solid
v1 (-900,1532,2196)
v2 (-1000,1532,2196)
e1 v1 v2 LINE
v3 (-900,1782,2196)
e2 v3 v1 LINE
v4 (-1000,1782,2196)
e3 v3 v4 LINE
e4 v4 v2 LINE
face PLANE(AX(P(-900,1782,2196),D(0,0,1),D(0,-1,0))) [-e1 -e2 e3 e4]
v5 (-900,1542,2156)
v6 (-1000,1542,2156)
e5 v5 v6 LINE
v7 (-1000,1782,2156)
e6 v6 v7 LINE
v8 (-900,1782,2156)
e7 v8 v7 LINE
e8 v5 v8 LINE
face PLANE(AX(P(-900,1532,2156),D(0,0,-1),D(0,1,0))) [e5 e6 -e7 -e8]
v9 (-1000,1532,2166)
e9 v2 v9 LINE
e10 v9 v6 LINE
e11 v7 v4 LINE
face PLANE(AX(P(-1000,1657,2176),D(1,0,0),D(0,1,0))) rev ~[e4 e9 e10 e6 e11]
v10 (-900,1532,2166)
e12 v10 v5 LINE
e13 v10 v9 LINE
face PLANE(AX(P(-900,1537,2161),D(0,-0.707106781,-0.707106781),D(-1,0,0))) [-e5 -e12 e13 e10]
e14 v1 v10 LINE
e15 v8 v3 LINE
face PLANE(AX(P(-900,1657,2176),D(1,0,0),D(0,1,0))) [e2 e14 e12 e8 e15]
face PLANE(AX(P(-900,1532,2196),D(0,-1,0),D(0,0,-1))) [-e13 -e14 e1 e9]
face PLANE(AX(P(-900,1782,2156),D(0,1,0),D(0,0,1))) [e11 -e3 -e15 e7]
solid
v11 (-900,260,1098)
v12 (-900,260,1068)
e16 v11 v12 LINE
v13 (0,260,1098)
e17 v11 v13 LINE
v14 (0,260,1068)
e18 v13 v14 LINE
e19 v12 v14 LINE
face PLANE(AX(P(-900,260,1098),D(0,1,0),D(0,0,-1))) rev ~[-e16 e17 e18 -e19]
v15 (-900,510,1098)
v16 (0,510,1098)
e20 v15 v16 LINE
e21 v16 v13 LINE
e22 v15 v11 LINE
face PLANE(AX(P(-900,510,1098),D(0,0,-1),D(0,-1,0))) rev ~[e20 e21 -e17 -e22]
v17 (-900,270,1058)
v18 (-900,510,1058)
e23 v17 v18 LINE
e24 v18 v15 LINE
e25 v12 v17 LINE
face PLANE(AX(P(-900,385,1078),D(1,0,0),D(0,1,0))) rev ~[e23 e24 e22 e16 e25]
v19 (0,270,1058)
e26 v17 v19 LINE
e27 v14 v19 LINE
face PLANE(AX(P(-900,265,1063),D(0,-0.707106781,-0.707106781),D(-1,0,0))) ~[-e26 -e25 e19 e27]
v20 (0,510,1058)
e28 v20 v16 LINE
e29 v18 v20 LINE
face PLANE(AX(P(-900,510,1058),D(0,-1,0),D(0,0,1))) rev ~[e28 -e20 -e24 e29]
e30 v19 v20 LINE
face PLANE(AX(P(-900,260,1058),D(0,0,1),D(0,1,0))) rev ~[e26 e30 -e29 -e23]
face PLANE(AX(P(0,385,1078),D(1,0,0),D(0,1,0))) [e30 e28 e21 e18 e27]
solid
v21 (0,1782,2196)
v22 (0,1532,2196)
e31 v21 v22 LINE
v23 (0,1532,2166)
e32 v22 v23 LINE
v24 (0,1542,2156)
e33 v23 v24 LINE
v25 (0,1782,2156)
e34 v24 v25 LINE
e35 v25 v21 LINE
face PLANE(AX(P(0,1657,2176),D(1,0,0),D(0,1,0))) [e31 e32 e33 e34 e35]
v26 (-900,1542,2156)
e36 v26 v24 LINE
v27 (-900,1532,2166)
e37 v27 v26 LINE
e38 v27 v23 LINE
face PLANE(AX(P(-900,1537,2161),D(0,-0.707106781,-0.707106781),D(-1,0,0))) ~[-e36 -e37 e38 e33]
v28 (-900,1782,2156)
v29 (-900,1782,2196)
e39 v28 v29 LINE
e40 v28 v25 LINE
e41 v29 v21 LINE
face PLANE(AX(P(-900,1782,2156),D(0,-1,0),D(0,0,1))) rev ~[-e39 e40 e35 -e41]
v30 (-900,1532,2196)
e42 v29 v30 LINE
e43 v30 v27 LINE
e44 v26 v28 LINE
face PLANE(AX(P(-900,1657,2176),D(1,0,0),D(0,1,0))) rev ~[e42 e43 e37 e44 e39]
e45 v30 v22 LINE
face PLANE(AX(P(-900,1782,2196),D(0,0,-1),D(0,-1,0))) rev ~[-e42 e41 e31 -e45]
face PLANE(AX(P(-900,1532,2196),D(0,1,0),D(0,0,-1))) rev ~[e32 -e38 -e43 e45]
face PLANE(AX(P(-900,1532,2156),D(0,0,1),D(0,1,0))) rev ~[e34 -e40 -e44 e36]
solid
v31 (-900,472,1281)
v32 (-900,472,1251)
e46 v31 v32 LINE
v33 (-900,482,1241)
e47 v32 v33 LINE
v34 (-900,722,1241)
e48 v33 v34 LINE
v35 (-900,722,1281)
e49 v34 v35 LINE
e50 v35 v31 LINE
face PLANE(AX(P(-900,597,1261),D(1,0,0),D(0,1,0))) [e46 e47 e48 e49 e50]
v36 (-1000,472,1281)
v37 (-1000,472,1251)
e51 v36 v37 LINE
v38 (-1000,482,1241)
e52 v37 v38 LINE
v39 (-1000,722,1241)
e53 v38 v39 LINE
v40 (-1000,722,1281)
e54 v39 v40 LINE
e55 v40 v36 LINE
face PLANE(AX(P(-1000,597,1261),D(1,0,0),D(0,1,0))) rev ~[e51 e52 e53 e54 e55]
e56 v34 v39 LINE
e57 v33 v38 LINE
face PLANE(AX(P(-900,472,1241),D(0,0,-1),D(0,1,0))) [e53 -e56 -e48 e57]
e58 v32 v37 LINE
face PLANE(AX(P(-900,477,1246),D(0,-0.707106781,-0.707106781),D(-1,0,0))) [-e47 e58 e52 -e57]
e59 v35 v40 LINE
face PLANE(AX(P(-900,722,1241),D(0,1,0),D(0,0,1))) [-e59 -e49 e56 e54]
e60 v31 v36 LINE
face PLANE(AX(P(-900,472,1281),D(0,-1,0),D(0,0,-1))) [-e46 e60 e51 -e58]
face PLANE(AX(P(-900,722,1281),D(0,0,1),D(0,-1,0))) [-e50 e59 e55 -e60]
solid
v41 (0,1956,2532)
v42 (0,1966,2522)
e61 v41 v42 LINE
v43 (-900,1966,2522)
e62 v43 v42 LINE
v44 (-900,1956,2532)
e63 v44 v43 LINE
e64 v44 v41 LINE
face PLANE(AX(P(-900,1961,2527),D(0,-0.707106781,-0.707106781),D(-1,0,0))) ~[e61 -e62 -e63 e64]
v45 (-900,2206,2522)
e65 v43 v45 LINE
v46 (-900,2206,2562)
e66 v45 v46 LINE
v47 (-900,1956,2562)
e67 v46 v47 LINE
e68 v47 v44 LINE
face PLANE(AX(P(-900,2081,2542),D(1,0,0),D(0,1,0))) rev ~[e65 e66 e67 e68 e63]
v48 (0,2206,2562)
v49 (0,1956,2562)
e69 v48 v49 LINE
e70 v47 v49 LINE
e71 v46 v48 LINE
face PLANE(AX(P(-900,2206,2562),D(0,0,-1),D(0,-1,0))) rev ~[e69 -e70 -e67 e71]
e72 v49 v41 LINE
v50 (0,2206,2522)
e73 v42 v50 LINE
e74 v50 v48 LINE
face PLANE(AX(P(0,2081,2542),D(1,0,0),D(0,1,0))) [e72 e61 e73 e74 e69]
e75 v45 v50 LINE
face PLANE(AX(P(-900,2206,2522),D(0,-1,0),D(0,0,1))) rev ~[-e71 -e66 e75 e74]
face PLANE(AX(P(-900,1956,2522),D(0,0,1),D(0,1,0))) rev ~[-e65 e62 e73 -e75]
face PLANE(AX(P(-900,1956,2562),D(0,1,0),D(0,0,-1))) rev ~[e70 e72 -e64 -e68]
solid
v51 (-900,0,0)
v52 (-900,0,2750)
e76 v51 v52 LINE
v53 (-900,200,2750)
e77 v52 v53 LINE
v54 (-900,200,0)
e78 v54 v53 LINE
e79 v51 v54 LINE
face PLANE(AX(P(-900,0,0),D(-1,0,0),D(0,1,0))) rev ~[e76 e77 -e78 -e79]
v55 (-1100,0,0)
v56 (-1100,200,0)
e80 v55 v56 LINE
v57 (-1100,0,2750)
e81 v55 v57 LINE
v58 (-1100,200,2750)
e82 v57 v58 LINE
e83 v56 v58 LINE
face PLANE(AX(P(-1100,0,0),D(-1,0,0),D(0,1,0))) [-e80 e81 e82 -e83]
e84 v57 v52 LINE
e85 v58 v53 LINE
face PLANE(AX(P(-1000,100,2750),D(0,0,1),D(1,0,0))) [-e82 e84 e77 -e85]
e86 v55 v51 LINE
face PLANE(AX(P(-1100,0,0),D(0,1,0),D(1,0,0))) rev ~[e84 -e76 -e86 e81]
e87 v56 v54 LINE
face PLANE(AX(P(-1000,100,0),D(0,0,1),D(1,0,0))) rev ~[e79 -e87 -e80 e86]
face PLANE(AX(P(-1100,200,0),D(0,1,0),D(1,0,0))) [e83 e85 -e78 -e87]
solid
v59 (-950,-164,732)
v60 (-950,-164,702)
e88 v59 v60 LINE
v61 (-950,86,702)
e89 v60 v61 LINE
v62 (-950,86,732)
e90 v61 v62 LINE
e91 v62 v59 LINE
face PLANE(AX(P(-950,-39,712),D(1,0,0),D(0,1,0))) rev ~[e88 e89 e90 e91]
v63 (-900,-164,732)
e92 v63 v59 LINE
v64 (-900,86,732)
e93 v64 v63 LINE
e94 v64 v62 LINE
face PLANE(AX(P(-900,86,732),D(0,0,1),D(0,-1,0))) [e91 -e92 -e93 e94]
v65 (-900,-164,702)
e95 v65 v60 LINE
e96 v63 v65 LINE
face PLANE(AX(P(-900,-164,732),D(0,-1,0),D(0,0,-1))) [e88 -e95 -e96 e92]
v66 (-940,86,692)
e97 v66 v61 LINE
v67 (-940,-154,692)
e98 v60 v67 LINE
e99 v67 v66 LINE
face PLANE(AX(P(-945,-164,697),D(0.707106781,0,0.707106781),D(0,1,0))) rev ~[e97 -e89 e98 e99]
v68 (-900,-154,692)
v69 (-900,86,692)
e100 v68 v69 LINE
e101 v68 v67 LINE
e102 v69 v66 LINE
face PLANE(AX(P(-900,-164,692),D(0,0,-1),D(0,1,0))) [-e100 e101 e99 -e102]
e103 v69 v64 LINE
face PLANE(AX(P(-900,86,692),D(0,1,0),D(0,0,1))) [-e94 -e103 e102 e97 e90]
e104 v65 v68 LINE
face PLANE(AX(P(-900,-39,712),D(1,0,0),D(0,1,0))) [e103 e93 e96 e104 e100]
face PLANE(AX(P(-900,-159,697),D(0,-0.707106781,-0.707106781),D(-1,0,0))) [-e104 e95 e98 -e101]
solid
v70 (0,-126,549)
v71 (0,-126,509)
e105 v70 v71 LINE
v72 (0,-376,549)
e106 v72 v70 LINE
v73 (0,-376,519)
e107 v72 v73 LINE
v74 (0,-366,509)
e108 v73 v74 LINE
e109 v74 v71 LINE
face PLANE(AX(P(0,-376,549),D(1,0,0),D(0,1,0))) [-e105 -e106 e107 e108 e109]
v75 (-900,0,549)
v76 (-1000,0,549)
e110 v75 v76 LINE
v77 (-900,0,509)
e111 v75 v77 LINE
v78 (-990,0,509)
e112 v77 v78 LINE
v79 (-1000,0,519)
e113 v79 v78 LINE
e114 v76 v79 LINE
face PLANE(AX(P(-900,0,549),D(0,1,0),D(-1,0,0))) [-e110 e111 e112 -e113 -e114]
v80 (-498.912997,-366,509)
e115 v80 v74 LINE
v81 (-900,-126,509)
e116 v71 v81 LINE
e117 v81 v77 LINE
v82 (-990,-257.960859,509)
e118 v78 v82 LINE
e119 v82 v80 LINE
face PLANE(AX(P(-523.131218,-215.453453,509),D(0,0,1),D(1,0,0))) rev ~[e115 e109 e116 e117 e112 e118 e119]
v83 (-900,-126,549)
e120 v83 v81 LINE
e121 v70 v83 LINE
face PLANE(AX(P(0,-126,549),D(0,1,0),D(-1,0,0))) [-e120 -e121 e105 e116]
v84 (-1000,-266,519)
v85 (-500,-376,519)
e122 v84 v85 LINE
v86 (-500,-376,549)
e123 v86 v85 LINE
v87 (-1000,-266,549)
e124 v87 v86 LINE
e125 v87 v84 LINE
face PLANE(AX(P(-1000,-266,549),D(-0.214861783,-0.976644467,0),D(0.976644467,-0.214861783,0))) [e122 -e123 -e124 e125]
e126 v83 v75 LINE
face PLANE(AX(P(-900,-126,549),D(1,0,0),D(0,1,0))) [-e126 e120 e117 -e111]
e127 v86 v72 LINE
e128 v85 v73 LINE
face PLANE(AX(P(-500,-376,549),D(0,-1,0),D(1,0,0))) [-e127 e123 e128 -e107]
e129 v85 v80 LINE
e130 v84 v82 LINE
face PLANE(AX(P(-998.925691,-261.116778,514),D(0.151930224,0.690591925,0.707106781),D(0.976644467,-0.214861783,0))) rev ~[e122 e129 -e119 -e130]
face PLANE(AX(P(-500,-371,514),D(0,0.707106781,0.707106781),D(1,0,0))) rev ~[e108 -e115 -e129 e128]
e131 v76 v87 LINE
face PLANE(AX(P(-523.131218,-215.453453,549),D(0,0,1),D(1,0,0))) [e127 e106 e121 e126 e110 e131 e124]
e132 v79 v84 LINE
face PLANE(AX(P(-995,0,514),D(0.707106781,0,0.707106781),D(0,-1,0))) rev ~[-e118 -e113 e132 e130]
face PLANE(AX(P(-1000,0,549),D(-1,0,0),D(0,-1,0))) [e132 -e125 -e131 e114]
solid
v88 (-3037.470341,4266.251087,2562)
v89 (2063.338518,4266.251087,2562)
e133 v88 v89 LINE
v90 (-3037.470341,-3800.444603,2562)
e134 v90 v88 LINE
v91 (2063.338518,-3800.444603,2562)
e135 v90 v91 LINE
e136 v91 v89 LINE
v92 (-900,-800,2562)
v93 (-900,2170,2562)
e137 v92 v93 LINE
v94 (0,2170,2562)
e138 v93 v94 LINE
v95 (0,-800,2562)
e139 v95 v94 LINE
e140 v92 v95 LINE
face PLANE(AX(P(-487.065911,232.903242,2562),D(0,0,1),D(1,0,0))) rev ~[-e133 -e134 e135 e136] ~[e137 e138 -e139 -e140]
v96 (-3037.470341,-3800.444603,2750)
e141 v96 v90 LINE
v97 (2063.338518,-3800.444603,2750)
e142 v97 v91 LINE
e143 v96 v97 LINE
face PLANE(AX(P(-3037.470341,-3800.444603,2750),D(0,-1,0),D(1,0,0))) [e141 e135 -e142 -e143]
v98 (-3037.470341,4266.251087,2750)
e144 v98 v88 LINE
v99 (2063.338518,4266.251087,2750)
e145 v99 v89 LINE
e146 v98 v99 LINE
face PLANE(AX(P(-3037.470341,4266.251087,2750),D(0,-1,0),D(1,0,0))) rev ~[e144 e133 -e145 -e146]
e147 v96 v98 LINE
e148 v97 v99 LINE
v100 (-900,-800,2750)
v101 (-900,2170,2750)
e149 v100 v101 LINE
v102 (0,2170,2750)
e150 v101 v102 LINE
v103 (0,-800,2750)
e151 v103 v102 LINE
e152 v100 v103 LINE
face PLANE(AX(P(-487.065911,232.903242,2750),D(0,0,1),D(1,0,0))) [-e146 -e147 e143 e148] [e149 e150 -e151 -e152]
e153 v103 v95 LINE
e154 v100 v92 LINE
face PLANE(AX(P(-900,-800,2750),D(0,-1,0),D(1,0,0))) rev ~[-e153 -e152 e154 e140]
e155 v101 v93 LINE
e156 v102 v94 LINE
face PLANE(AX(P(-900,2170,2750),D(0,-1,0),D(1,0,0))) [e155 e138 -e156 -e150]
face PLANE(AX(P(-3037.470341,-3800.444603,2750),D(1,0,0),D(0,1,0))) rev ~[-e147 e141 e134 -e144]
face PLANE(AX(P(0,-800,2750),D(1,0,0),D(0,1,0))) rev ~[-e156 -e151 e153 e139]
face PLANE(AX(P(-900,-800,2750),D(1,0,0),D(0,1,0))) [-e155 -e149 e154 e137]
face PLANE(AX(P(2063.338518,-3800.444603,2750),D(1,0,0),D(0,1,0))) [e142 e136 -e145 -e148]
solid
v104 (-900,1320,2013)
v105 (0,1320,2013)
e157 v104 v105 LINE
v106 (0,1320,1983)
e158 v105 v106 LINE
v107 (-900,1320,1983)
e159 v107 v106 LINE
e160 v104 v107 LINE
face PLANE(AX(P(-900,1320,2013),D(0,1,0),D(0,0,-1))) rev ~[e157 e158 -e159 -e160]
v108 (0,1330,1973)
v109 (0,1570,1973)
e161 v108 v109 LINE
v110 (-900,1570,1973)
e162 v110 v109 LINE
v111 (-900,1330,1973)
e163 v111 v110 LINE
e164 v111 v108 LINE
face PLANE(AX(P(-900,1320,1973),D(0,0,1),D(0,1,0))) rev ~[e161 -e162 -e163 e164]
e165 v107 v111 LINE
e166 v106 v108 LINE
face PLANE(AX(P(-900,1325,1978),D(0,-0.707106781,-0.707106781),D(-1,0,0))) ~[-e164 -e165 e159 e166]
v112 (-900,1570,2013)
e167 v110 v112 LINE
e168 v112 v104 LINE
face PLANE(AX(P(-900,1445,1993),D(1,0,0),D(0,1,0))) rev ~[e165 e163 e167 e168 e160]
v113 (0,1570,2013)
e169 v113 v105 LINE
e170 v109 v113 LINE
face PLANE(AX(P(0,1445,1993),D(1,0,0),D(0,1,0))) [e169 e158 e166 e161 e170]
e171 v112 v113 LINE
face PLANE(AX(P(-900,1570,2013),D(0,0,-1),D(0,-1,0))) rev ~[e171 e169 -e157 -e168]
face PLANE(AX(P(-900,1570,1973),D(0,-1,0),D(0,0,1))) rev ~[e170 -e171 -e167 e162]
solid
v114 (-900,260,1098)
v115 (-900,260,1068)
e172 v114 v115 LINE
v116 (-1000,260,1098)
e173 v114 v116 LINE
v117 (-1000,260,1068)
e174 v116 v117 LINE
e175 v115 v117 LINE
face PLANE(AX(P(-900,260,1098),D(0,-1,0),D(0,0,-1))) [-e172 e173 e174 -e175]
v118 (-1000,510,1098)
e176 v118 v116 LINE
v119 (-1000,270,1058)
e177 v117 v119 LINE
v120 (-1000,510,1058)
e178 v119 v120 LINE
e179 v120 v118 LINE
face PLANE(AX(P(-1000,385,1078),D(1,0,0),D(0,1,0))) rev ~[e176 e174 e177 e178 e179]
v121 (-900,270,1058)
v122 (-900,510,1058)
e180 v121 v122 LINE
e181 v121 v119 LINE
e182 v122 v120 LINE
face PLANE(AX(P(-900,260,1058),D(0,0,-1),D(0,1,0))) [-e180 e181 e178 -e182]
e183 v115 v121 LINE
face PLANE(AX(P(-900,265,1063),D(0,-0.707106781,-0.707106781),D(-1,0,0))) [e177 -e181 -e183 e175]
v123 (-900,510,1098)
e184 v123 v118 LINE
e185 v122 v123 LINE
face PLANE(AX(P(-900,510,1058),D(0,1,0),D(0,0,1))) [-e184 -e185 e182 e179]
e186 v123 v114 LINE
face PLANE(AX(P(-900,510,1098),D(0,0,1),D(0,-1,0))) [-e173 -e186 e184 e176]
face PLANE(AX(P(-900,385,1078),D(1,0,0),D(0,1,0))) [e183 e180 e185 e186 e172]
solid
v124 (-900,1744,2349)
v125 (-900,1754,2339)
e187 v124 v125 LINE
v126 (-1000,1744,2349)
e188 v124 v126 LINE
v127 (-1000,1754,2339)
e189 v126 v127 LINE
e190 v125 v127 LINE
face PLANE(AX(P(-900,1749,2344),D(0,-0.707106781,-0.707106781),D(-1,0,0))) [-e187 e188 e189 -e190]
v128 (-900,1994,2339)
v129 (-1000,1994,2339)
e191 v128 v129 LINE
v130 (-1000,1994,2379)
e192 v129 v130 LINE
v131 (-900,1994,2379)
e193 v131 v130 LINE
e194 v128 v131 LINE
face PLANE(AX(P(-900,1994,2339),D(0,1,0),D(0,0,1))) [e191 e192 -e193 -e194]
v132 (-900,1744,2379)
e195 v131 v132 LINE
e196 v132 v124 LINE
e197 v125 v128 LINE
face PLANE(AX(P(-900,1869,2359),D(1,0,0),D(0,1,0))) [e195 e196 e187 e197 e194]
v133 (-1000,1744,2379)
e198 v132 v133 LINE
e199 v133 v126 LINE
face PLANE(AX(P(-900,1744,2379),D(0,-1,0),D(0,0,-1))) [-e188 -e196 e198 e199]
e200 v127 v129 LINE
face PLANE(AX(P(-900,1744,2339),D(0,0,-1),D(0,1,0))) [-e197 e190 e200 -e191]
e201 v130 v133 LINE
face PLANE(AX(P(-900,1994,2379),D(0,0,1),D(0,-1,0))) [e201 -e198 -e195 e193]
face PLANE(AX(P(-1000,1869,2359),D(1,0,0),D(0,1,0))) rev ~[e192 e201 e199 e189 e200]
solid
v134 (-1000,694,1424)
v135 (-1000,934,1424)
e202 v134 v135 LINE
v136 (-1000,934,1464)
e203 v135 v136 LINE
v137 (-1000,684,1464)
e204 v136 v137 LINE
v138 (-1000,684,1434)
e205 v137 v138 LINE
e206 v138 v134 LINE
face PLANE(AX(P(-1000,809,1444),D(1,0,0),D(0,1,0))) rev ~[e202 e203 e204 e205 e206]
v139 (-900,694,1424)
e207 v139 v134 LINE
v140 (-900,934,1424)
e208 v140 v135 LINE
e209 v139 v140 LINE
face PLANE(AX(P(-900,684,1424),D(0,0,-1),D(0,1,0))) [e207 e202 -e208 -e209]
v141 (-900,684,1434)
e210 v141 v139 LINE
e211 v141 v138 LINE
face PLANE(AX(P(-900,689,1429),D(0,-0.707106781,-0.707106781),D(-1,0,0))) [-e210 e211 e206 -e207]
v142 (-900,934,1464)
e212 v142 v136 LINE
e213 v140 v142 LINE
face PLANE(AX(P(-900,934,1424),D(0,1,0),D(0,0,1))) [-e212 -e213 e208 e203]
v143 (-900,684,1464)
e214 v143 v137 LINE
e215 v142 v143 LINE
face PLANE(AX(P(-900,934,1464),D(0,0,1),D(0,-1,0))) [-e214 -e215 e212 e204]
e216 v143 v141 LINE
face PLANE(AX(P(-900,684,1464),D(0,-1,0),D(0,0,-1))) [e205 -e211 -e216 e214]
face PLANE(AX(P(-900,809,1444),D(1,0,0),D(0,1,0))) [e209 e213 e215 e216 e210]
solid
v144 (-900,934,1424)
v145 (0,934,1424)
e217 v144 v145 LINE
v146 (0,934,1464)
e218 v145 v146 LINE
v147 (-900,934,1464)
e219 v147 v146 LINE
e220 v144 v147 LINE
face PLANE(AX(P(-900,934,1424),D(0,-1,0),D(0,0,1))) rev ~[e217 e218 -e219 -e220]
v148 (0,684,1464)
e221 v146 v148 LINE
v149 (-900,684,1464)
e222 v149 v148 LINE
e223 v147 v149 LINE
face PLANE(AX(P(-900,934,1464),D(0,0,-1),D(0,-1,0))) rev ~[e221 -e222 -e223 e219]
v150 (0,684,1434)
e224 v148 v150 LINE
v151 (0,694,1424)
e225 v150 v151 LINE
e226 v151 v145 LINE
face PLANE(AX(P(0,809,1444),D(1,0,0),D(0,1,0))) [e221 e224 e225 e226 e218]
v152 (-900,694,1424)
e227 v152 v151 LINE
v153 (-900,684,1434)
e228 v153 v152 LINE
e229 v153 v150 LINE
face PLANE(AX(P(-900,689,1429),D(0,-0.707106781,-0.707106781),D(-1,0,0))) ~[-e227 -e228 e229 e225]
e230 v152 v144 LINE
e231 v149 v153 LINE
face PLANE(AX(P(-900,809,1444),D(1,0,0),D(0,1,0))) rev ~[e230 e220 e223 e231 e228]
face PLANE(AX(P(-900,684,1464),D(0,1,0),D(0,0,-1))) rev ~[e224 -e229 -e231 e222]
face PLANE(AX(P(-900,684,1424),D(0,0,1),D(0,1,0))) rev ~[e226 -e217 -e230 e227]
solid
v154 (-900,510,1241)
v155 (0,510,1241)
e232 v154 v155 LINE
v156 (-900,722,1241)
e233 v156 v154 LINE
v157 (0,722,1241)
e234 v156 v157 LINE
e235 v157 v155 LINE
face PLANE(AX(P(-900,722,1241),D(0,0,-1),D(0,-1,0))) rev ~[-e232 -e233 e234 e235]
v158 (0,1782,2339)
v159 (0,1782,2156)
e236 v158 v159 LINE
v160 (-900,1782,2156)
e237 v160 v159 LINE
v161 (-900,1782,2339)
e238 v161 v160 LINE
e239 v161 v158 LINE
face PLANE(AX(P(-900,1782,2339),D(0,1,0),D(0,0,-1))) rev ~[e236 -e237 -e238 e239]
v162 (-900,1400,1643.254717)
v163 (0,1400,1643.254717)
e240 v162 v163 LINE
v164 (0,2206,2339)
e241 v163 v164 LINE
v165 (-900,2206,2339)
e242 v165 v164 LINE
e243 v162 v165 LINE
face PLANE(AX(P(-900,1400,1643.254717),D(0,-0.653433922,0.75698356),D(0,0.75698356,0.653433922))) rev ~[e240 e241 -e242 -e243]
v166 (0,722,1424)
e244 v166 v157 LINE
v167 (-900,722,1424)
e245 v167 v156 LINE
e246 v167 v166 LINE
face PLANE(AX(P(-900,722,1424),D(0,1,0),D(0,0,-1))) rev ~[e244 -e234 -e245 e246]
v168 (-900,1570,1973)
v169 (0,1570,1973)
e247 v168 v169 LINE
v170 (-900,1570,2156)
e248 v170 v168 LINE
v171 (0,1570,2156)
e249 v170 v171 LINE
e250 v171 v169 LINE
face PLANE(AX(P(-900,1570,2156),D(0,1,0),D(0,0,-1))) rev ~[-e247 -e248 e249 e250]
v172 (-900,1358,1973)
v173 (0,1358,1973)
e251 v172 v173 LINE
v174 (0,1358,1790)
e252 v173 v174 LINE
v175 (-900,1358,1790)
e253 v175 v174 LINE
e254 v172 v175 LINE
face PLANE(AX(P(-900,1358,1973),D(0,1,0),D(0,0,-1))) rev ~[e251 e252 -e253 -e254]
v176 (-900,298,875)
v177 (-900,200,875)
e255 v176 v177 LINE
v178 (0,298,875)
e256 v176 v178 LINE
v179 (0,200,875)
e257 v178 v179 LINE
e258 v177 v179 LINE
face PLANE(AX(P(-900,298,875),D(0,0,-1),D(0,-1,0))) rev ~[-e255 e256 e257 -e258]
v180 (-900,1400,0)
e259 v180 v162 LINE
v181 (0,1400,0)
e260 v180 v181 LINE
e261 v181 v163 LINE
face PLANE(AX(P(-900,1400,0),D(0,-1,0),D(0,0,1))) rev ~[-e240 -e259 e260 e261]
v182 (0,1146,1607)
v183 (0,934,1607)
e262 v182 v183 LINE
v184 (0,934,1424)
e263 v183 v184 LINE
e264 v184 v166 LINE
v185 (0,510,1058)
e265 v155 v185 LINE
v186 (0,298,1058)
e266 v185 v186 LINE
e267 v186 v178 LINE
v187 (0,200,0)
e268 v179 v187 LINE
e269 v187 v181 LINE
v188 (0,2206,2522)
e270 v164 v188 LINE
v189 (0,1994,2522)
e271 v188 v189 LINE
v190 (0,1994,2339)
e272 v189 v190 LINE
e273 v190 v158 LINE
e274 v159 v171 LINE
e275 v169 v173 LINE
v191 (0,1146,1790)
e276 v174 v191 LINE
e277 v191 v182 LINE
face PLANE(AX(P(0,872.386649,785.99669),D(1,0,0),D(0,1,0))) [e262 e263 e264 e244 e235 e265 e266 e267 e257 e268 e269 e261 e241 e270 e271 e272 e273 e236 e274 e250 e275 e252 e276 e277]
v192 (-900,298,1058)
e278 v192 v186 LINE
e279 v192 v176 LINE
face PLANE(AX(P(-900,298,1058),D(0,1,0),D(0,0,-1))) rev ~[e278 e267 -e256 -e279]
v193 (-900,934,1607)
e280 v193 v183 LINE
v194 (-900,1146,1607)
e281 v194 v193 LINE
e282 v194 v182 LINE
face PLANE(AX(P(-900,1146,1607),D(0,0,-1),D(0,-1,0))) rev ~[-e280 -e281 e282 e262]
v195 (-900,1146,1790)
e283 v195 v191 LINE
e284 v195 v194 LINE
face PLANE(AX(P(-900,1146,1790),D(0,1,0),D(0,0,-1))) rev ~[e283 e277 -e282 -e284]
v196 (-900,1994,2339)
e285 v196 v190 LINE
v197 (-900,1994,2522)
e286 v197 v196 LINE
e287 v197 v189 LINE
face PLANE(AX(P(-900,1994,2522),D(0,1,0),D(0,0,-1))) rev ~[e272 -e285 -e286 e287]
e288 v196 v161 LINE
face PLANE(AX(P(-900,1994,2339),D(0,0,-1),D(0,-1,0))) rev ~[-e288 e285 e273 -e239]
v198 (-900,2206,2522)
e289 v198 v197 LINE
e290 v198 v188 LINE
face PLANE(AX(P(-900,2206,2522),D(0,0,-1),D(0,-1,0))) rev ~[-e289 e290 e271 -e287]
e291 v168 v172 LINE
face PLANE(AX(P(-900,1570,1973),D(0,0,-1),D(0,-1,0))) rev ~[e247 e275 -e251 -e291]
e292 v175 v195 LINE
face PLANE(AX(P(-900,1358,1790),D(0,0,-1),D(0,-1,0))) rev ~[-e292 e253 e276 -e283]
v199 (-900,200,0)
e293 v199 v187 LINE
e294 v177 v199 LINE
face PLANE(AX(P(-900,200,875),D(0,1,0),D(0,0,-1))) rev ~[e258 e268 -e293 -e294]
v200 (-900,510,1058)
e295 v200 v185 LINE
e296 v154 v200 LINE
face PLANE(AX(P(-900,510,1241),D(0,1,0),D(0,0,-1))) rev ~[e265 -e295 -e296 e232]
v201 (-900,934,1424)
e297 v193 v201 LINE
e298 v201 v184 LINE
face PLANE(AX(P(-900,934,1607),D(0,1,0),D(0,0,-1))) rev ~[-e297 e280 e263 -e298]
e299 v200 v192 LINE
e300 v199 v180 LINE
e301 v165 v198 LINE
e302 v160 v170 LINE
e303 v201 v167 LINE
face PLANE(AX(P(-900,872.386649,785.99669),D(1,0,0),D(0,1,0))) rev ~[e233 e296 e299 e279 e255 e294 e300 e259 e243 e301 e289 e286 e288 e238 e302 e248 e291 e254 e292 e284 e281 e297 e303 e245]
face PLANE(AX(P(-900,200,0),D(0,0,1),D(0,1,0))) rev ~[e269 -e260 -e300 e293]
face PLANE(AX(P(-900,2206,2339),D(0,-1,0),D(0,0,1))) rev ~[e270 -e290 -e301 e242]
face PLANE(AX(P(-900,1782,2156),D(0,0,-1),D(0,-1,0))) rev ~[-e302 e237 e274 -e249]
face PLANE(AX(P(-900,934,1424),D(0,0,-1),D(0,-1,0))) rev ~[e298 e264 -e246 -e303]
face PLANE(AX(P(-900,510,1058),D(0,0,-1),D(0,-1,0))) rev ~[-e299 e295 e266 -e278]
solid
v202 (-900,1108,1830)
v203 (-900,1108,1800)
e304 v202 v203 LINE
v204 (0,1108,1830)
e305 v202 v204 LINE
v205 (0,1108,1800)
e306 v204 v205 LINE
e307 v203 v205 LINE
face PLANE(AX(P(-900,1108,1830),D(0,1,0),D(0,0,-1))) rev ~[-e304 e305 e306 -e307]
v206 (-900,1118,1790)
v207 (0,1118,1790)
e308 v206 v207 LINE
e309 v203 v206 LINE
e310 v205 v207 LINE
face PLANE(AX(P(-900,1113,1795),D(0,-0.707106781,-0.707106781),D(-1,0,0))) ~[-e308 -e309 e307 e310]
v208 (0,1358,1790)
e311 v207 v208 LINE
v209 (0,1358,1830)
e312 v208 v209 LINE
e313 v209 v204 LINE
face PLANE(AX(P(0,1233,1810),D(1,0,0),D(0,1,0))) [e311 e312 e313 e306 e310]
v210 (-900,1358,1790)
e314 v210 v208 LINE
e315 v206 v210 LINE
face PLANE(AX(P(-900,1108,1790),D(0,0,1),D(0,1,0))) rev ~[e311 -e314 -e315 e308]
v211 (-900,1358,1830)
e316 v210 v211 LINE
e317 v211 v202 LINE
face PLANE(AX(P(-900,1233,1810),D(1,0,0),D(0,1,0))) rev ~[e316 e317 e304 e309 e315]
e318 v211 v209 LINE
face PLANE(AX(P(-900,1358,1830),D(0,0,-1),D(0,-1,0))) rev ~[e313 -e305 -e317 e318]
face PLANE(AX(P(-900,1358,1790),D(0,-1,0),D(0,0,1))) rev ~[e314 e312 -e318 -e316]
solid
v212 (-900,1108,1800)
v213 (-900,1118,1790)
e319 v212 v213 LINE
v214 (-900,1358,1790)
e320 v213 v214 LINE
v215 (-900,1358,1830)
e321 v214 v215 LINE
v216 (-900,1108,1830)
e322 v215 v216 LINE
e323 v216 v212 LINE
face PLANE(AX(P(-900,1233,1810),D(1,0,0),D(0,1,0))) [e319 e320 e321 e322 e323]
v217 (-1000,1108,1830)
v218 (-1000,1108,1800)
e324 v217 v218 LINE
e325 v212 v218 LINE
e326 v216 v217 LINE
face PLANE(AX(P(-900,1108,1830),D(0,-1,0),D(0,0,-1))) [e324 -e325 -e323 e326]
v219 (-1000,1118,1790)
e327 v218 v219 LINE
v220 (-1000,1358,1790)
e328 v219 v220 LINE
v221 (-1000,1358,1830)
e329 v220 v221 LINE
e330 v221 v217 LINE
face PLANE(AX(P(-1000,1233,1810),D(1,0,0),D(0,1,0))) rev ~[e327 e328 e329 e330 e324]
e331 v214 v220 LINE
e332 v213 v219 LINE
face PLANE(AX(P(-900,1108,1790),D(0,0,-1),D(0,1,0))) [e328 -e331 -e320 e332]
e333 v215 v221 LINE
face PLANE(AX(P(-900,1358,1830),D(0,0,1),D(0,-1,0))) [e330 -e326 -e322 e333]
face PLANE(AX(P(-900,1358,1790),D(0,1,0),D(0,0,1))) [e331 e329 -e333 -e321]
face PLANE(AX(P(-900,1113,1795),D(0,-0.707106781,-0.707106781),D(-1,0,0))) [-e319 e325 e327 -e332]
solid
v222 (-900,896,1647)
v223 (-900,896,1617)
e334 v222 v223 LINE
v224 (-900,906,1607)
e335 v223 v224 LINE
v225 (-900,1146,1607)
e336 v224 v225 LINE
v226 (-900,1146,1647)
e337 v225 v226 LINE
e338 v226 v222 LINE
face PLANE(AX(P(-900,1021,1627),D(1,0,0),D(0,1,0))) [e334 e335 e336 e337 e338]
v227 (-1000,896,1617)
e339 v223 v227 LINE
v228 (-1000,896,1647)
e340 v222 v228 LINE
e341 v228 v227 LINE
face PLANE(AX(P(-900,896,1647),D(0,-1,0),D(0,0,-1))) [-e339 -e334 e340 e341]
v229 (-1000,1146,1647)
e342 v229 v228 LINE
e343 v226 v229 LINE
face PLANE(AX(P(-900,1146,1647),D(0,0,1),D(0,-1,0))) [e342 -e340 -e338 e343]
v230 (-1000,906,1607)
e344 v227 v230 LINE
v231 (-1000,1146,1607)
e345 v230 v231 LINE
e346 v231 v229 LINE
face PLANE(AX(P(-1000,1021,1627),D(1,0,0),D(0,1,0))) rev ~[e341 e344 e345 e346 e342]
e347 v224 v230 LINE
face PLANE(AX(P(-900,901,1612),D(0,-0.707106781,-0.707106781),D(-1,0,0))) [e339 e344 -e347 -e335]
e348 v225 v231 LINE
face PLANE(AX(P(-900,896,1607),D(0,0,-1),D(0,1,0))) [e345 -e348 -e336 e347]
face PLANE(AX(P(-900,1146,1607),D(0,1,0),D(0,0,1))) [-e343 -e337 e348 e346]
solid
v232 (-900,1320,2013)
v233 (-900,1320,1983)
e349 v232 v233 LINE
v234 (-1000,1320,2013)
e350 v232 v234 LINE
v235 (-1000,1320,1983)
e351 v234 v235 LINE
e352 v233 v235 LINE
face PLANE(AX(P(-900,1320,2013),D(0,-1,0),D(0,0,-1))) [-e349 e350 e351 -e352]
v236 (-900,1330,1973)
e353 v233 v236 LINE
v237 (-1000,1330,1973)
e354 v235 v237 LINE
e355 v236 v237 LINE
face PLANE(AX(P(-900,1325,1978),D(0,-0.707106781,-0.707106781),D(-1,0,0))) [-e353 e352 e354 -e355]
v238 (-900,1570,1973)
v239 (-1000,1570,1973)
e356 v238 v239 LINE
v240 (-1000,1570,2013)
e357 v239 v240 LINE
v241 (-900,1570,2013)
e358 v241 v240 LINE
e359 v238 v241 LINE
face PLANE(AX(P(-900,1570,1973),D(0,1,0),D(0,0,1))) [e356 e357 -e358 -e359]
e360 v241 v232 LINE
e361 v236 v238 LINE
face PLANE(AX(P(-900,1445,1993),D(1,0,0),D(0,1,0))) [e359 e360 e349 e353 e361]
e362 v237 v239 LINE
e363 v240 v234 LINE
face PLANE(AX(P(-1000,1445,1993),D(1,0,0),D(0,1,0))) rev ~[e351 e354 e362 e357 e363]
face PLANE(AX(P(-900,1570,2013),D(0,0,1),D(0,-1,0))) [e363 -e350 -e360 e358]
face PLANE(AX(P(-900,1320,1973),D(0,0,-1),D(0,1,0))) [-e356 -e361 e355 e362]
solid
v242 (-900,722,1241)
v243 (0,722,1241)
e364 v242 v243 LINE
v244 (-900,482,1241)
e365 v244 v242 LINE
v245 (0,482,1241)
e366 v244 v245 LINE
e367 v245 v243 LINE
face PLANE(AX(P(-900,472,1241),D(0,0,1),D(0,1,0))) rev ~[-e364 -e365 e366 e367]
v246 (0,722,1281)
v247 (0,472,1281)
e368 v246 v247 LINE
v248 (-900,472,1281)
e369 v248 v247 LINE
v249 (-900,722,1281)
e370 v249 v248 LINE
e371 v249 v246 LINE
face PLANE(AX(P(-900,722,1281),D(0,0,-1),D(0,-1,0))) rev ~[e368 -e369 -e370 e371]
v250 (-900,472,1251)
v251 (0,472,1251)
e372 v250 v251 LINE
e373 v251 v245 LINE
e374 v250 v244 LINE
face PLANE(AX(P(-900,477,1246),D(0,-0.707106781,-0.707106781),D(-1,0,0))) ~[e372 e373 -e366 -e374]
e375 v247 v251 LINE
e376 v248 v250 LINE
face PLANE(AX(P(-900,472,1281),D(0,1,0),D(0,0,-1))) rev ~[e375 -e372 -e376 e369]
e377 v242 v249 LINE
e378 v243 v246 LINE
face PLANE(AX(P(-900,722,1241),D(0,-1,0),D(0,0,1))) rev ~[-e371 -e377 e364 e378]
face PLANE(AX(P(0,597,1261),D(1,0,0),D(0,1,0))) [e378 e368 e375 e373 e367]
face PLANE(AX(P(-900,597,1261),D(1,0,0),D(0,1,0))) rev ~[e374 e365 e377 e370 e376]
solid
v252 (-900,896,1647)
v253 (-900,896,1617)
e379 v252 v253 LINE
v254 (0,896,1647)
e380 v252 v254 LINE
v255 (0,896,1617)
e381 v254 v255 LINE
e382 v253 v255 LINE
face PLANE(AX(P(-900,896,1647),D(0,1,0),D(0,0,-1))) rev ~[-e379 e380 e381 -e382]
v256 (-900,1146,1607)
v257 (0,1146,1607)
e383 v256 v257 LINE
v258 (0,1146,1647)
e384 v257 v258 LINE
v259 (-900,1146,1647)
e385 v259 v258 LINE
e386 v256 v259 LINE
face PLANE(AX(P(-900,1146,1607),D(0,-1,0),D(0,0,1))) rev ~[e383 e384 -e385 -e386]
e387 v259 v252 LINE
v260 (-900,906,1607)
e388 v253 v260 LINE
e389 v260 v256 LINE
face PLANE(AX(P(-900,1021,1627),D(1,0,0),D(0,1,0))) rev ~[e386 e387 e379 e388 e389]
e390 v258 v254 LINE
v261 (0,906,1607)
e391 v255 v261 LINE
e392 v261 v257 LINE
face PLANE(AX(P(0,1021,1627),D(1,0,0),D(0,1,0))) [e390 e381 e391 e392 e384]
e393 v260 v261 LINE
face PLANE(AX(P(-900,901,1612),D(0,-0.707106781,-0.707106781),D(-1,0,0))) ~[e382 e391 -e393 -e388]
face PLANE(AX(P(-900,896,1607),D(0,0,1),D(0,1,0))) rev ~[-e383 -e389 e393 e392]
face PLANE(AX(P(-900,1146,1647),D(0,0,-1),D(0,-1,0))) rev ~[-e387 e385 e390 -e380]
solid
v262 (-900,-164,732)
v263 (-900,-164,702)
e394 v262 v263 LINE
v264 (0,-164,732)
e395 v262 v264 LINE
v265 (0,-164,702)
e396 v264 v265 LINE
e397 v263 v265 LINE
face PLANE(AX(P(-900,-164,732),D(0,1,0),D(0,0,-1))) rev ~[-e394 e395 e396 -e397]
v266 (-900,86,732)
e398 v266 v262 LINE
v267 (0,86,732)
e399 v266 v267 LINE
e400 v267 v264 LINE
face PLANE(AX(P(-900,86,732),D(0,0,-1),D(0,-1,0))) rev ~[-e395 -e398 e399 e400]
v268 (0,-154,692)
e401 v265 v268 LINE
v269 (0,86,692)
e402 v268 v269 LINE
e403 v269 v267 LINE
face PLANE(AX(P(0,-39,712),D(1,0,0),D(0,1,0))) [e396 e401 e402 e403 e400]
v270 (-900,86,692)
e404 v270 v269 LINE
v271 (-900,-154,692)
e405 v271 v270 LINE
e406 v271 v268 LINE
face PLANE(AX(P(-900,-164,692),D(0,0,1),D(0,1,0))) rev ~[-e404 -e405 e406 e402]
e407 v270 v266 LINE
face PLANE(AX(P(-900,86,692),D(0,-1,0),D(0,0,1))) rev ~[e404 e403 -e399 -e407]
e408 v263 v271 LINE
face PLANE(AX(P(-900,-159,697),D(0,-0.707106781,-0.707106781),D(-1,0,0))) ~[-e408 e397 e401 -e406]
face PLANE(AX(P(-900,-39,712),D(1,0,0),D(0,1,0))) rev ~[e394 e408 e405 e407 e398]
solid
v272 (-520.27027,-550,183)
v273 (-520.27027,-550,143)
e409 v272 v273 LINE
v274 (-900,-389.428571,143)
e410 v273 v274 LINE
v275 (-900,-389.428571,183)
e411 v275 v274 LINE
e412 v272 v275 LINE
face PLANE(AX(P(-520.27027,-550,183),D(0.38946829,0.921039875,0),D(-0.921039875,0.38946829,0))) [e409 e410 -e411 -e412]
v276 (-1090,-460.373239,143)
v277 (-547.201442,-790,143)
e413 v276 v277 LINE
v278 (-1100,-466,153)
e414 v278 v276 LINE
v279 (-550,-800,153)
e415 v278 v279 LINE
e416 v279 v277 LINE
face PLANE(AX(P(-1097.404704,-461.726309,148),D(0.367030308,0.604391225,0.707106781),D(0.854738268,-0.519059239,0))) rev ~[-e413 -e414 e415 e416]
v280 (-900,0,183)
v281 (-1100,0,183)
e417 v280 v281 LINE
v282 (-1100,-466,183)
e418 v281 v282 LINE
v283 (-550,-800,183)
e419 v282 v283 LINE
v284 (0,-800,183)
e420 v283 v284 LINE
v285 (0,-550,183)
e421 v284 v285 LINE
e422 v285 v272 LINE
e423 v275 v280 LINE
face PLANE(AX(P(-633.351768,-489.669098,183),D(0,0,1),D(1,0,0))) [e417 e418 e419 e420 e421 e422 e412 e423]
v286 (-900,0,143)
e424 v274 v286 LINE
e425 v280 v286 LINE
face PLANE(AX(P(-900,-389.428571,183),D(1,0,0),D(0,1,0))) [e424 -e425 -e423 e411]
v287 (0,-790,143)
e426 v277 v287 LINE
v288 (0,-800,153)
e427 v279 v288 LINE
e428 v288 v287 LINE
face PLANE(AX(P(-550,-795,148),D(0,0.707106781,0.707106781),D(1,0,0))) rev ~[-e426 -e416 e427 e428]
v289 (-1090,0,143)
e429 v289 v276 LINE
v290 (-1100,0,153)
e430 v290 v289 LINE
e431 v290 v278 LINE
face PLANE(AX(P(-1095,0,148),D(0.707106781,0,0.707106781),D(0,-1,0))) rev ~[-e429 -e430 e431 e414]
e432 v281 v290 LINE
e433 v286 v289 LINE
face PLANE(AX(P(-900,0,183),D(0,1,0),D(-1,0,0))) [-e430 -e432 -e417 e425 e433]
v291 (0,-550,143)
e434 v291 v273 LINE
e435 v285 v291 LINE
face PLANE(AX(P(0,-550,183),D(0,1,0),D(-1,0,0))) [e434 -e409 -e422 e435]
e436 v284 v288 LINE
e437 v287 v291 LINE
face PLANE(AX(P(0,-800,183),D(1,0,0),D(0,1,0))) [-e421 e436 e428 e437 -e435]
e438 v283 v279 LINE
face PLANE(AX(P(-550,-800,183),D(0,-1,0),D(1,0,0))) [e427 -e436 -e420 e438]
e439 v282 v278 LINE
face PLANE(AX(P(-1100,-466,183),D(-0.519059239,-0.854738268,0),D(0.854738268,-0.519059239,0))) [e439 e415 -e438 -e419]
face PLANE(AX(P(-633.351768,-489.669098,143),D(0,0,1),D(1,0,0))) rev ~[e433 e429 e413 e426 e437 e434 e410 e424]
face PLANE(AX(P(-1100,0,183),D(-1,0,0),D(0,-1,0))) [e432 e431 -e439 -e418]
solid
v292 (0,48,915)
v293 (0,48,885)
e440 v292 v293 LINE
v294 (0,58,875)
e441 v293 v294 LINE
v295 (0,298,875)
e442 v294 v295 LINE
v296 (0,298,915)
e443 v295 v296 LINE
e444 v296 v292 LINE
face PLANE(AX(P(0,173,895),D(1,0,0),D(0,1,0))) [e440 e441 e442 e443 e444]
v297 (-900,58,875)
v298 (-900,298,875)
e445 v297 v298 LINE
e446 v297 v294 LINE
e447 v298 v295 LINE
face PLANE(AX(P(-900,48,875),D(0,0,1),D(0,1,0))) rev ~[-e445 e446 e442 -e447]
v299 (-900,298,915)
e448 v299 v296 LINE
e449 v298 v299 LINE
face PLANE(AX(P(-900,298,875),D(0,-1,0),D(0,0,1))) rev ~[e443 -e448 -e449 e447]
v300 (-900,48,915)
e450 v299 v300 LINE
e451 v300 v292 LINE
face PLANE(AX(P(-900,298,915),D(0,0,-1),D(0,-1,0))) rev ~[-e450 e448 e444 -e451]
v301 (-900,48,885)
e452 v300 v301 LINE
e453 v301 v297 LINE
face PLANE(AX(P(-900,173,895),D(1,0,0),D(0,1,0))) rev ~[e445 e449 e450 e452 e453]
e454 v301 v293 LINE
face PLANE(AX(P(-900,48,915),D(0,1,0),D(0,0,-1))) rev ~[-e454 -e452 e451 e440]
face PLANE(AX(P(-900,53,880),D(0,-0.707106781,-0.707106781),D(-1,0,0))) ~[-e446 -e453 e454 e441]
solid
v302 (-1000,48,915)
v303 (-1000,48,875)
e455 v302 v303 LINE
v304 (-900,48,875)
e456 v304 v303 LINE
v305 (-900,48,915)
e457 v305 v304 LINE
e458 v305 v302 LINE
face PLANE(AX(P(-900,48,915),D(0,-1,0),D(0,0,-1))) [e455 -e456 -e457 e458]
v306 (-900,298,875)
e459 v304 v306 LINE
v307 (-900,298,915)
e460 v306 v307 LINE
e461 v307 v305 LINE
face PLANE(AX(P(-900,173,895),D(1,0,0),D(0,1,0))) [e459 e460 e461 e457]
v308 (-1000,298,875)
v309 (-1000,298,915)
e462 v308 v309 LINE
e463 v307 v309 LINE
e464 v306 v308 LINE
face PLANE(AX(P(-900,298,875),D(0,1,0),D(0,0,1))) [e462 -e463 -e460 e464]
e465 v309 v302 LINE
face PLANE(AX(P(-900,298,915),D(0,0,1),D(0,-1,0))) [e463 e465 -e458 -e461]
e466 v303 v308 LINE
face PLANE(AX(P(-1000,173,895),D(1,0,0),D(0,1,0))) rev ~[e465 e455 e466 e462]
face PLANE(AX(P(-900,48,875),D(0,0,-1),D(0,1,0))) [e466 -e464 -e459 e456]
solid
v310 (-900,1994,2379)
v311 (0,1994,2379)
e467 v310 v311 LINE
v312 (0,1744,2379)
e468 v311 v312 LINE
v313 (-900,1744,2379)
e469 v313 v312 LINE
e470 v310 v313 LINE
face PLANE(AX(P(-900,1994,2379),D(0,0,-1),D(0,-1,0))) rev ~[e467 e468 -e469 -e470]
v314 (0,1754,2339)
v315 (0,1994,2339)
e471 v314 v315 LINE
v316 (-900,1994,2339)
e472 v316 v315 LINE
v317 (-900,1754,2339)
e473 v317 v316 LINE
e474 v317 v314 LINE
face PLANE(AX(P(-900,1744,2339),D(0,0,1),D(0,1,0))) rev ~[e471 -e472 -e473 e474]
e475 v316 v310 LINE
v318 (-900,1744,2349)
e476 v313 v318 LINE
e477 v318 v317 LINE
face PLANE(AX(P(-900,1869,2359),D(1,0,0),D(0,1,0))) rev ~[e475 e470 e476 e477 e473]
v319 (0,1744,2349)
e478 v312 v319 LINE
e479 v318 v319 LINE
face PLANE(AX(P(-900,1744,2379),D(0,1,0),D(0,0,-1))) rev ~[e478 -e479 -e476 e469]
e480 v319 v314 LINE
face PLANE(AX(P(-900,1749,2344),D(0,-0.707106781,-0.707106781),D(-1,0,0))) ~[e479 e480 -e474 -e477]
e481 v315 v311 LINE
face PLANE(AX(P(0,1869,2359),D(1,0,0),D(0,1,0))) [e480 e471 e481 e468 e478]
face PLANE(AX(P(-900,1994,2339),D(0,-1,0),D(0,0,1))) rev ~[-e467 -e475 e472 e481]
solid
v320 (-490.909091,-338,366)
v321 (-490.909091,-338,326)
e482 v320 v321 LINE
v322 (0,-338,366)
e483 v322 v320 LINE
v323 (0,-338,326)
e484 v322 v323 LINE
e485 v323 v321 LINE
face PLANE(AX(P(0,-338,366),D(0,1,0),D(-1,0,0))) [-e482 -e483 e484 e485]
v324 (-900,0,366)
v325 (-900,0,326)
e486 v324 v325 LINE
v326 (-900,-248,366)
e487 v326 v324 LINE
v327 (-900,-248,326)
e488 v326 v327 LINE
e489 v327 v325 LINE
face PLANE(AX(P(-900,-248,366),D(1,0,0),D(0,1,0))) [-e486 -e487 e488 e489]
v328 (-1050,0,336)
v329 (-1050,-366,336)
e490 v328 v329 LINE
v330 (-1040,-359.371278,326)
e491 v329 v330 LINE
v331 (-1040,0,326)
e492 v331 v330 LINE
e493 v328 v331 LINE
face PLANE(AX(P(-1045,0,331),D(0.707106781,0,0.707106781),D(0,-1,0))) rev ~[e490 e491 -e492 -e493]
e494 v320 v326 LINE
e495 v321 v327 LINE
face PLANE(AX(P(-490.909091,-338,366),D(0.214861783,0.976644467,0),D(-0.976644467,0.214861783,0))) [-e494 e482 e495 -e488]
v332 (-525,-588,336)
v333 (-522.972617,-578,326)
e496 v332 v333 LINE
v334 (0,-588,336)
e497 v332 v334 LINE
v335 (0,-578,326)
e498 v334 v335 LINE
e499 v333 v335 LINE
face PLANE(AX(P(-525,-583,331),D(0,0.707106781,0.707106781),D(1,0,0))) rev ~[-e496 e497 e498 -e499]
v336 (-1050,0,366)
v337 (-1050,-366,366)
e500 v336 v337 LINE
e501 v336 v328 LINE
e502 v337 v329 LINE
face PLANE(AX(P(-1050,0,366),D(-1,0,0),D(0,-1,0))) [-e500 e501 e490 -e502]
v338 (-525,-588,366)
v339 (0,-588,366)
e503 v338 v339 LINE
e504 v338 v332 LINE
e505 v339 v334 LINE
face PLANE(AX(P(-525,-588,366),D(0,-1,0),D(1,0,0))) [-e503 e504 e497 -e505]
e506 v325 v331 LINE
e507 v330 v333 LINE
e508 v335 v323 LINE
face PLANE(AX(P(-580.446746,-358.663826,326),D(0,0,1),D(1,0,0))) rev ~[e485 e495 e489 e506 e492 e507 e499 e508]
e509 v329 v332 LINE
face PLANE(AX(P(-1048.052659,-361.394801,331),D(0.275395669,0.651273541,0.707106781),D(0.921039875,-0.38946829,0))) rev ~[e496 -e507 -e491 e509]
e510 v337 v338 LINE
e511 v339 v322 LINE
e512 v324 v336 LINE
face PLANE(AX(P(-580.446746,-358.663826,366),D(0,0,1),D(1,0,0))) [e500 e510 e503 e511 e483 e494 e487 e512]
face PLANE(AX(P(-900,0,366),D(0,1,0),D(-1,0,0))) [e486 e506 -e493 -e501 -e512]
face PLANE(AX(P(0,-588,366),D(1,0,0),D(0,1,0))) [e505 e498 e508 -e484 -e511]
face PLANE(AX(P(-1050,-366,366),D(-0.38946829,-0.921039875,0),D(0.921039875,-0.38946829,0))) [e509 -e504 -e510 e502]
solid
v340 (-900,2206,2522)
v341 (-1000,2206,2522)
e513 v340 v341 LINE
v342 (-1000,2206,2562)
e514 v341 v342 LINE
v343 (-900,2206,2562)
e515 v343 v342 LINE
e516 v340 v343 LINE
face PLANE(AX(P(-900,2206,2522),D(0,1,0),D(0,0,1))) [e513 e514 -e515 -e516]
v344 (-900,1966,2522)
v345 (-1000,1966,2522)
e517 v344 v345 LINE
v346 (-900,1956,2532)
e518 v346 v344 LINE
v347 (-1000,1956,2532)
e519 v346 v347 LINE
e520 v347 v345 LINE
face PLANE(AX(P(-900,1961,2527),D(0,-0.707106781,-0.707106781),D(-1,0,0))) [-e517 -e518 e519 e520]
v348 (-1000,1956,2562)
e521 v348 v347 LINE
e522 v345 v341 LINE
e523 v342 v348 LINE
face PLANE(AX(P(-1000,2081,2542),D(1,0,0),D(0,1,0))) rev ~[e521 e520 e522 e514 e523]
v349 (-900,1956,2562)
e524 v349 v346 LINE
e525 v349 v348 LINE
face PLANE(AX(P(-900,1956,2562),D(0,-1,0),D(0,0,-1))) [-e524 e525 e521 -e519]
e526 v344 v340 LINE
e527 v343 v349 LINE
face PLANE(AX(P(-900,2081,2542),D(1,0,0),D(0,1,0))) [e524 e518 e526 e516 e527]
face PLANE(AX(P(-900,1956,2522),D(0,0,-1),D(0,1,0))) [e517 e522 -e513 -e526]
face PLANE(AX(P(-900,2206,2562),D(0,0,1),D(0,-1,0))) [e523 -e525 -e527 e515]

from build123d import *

# Parameters (mm, degrees)
F2_W        = 5100.8088588715
F2_H        = 8066.695690155
F2_W_2      = 900
F2_H_2      = 2970
F3_DEPTH    = 188
F4_W        = 200
F4_H        = 200
F5_DEPTH    = 2750
F9_DEPTH    = 900
F10_DEPTH   = 100
F12_DEPTH   = 900
F13_DEPTH   = 50
F18_DEPTH   = 40
F20_DEPTH   = 40
F22_DEPTH   = 40
F33_SIZE    = 10
F33_2_SIZE  = 10
F33_3_SIZE  = 10
F33_4_SIZE  = 10
F33_5_SIZE  = 10
F33_6_SIZE  = 10
F33_7_SIZE  = 10
F33_8_SIZE  = 10
F33_9_SIZE  = 10
F33_10_SIZE = 10
F33_11_SIZE = 10
F33_12_SIZE = 10
F33_13_SIZE = 10
F33_14_SIZE = 10
F33_15_SIZE = 10
F33_16_SIZE = 10
F33_17_SIZE = 10
F33_18_SIZE = 10
F33_19_SIZE = 10
F33_20_SIZE = 10
F33_21_SIZE = 10
F33_22_SIZE = 10
F33_23_SIZE = 10
F33_24_SIZE = 10


# Not quite as in the source:
# - the program builds the solid bodies; features that only make, move or delete a surface that nothing else refers to are left out


with BuildPart() as f3:
    # F2 (on offset) → F3 (new body)
    with BuildSketch(Plane.XY.offset(2750)):
        with Locations((-487.065911293, 232.9032421112)):
            Rectangle(F2_W, F2_H)
        with Locations((-450, 685)):
            Rectangle(F2_W_2, F2_H_2, mode=Mode.SUBTRACT)
    extrude(amount=-F3_DEPTH)


with BuildPart() as f5:
    # F4 (on Top) → F5 (new body, through all)
    with BuildSketch(Plane.XY):
        with Locations((-1000, 100)):
            Rectangle(F4_W, F4_H)
    extrude(amount=F5_DEPTH)


with BuildPart() as f9:
    # F8 (on plane+point) → F9 (new body, through all)
    with BuildSketch(Plane.YZ.offset(-900)):
        Polygon((2168, 2562), (1956, 2562), (1956, 2522), (2206, 2522), (2206, 2562), align=None)
    extrude(amount=F9_DEPTH)


with BuildPart() as f9b:
    # F8 (on plane+point) → F9, piece 2 (new body, through all)
    with BuildSketch(Plane.YZ.offset(-900)):
        Polygon((1956, 2379), (1744, 2379), (1744, 2339), (1994, 2339), (1994, 2379), align=None)
    extrude(amount=F9_DEPTH)


with BuildPart() as f9c:
    # F8 (on plane+point) → F9, piece 3 (new body, through all)
    with BuildSketch(Plane.YZ.offset(-900)):
        Polygon((1744, 2196), (1532, 2196), (1532, 2156), (1782, 2156), (1782, 2196), align=None)
    extrude(amount=F9_DEPTH)


with BuildPart() as f9d:
    # F8 (on plane+point) → F9, piece 4 (new body, through all)
    with BuildSketch(Plane.YZ.offset(-900)):
        Polygon((1532, 2013), (1320, 2013), (1320, 1973), (1570, 1973), (1570, 2013), align=None)
    extrude(amount=F9_DEPTH)


with BuildPart() as f9e:
    # F8 (on plane+point) → F9, piece 5 (new body, through all)
    with BuildSketch(Plane.YZ.offset(-900)):
        Polygon((1320, 1830), (1108, 1830), (1108, 1790), (1358, 1790), (1358, 1830), align=None)
    extrude(amount=F9_DEPTH)


with BuildPart() as f9f:
    # F8 (on plane+point) → F9, piece 6 (new body, through all)
    with BuildSketch(Plane.YZ.offset(-900)):
        Polygon((1108, 1647), (896, 1647), (896, 1607), (1146, 1607), (1146, 1647), align=None)
    extrude(amount=F9_DEPTH)


with BuildPart() as f9g:
    # F8 (on plane+point) → F9, piece 7 (new body, through all)
    with BuildSketch(Plane.YZ.offset(-900)):
        Polygon((896, 1464), (684, 1464), (684, 1424), (934, 1424), (934, 1464), align=None)
    extrude(amount=F9_DEPTH)


with BuildPart() as f9h:
    # F8 (on plane+point) → F9, piece 8 (new body, through all)
    with BuildSketch(Plane.YZ.offset(-900)):
        Polygon((684, 1281), (472, 1281), (472, 1241), (722, 1241), (722, 1281), align=None)
    extrude(amount=F9_DEPTH)


with BuildPart() as f9i:
    # F8 (on plane+point) → F9, piece 9 (new body, through all)
    with BuildSketch(Plane.YZ.offset(-900)):
        Polygon((472, 1098), (260, 1098), (260, 1058), (510, 1058), (510, 1098), align=None)
    extrude(amount=F9_DEPTH)


with BuildPart() as f9j:
    # F8 (on plane+point) → F9, piece 10 (new body, through all)
    with BuildSketch(Plane.YZ.offset(-900)):
        Polygon((260, 915), (48, 915), (48, 875), (298, 875), (298, 915), align=None)
    extrude(amount=F9_DEPTH)


with BuildPart() as f9k:
    # F8 (on plane+point) → F9, piece 11 (new body, through all)
    with BuildSketch(Plane.YZ.offset(-900)):
        Polygon((48, 732), (-164, 732), (-164, 692), (86, 692), (86, 732), align=None)
    extrude(amount=F9_DEPTH)


with BuildPart() as f10:
    # F10 (new): a face of the model
    f10_faces = [f9.part.faces().sort_by_distance(p)[0] for p in [
        (-900, 2081, 2542),
    ]]
    extrude(f10_faces, amount=F10_DEPTH)

    # F33
    f33_edges = [f10.edges().sort_by_distance(p)[0] for p in [
        (-950, 1956, 2522),
    ]]
    chamfer(f33_edges, length=F33_SIZE)


with BuildPart() as f10b:
    # F10#2 (new): a face of the model
    f10_2_faces = [f9b.part.faces().sort_by_distance(p)[0] for p in [
        (-900, 1869, 2359),
    ]]
    extrude(f10_2_faces, amount=F10_DEPTH)

    # F33#3
    f33_3_edges = [f10b.edges().sort_by_distance(p)[0] for p in [
        (-950, 1744, 2339),
    ]]
    chamfer(f33_3_edges, length=F33_3_SIZE)


with BuildPart() as f10c:
    # F10#3 (new): a face of the model
    f10_3_faces = [f9c.part.faces().sort_by_distance(p)[0] for p in [
        (-900, 1657, 2176),
    ]]
    extrude(f10_3_faces, amount=F10_DEPTH)

    # F33#5
    f33_5_edges = [f10c.edges().sort_by_distance(p)[0] for p in [
        (-950, 1532, 2156),
    ]]
    chamfer(f33_5_edges, length=F33_5_SIZE)


with BuildPart() as f10d:
    # F10#4 (new): a face of the model
    f10_4_faces = [f9d.part.faces().sort_by_distance(p)[0] for p in [
        (-900, 1445, 1993),
    ]]
    extrude(f10_4_faces, amount=F10_DEPTH)

    # F33#7
    f33_7_edges = [f10d.edges().sort_by_distance(p)[0] for p in [
        (-950, 1320, 1973),
    ]]
    chamfer(f33_7_edges, length=F33_7_SIZE)


with BuildPart() as f10e:
    # F10#5 (new): a face of the model
    f10_5_faces = [f9e.part.faces().sort_by_distance(p)[0] for p in [
        (-900, 1233, 1810),
    ]]
    extrude(f10_5_faces, amount=F10_DEPTH)

    # F33#9
    f33_9_edges = [f10e.edges().sort_by_distance(p)[0] for p in [
        (-950, 1108, 1790),
    ]]
    chamfer(f33_9_edges, length=F33_9_SIZE)


with BuildPart() as f10f:
    # F10#6 (new): a face of the model
    f10_6_faces = [f9f.part.faces().sort_by_distance(p)[0] for p in [
        (-900, 1021, 1627),
    ]]
    extrude(f10_6_faces, amount=F10_DEPTH)

    # F33#11
    f33_11_edges = [f10f.edges().sort_by_distance(p)[0] for p in [
        (-950, 896, 1607),
    ]]
    chamfer(f33_11_edges, length=F33_11_SIZE)


with BuildPart() as f10g:
    # F10#7 (new): a face of the model
    f10_7_faces = [f9g.part.faces().sort_by_distance(p)[0] for p in [
        (-900, 809, 1444),
    ]]
    extrude(f10_7_faces, amount=F10_DEPTH)

    # F33#13
    f33_13_edges = [f10g.edges().sort_by_distance(p)[0] for p in [
        (-950, 684, 1424),
    ]]
    chamfer(f33_13_edges, length=F33_13_SIZE)


with BuildPart() as f10h:
    # F10#8 (new): a face of the model
    f10_8_faces = [f9h.part.faces().sort_by_distance(p)[0] for p in [
        (-900, 597, 1261),
    ]]
    extrude(f10_8_faces, amount=F10_DEPTH)

    # F33#15
    f33_15_edges = [f10h.edges().sort_by_distance(p)[0] for p in [
        (-950, 472, 1241),
    ]]
    chamfer(f33_15_edges, length=F33_15_SIZE)


with BuildPart() as f10i:
    # F10#9 (new): a face of the model
    f10_9_faces = [f9i.part.faces().sort_by_distance(p)[0] for p in [
        (-900, 385, 1078),
    ]]
    extrude(f10_9_faces, amount=F10_DEPTH)

    # F33#17
    f33_17_edges = [f10i.edges().sort_by_distance(p)[0] for p in [
        (-950, 260, 1058),
    ]]
    chamfer(f33_17_edges, length=F33_17_SIZE)


with BuildPart() as f10j:
    # F10#10 (new): a face of the model
    f10_10_faces = [f9j.part.faces().sort_by_distance(p)[0] for p in [
        (-900, 173, 895),
    ]]
    extrude(f10_10_faces, amount=F10_DEPTH)


with BuildPart() as f12:
    # F11 (on plane+point) → F12 (new body, through all)
    with BuildSketch(Plane.YZ.offset(-900)):
        Polygon((298, 1058), (298, 915), (298, 875), (200, 875), (200, 0), (1400, 0), (1400, 1643.2547169811), (1146, 1424), (1146, 1607), (934, 1607), (934, 1464), (934, 1424), (722, 1424), (722, 1281), (722, 1241), (510, 1241), (510, 1098), (510, 1058), align=None)
        Polygon((1146, 1424), (1400, 1643.2547169811), (1400, 1973), (1358, 1973), (1358, 1830), (1358, 1790), (1146, 1790), (1146, 1647), (1146, 1607), align=None)
        Polygon((1400, 1973), (1400, 1643.2547169811), (2206, 2339), (2206, 2522), (1994, 2522), (1994, 2379), (1994, 2339), (1782, 2339), (1782, 2196), (1782, 2156), (1570, 2156), (1570, 2013), (1570, 1973), align=None)
    extrude(amount=F12_DEPTH)


with BuildPart() as f13:
    # F13 (new): a face of the model
    f13_faces = [f9k.part.faces().sort_by_distance(p)[0] for p in [
        (-900, -39, 712),
    ]]
    extrude(f13_faces, amount=F13_DEPTH)

    # F33#21
    f33_21_edges = [f13.edges().sort_by_distance(p)[0] for p in [
        (-925, -164, 692),
        (-950, -39, 692),
    ]]
    chamfer(f33_21_edges, length=F33_21_SIZE)


with BuildPart() as f18:
    # F17 (on plane+point) → F18 (new body)
    with BuildSketch(Plane.XY.offset(549)):
        Polygon((-1000, -266), (-500, -376), (0, -376), (0, -126), (-900, -126), (-900, 0), (-1000, 0), (-1000, -126), align=None)
    extrude(amount=-F18_DEPTH)

    # F33#22
    f33_22_edges = [f18.edges().sort_by_distance(p)[0] for p in [
        (-1000, -133, 509),
        (-750, -321, 509),
        (-250, -376, 509),
    ]]
    chamfer(f33_22_edges, length=F33_22_SIZE)


with BuildPart() as f20:
    # F19 (on plane+point) → F20 (new body)
    with BuildSketch(Plane.XY.offset(366)):
        Polygon((-1050, -366), (-525, -588), (0, -588), (0, -338), (-490.9090909091, -338), (-900, -248), (-900, 0), (-1050, 0), (-1050, -226), align=None)
    extrude(amount=-F20_DEPTH)

    # F33#23
    f33_23_edges = [f20.edges().sort_by_distance(p)[0] for p in [
        (-1050, -183, 326),
        (-787.5, -477, 326),
        (-262.5, -588, 326),
    ]]
    chamfer(f33_23_edges, length=F33_23_SIZE)


with BuildPart() as f22:
    # F21 (on plane+point) → F22 (new body)
    with BuildSketch(Plane.XY.offset(183)):
        Polygon((-1100, -466), (-550, -800), (0, -800), (0, -550), (-520.2702702703, -550), (-900, -389.4285714286), (-900, 0), (-1100, 0), (-1100, -326), align=None)
    extrude(amount=-F22_DEPTH)

    # F33#24
    f33_24_edges = [f22.edges().sort_by_distance(p)[0] for p in [
        (-1100, -233, 143),
        (-825, -633, 143),
        (-275, -800, 143),
    ]]
    chamfer(f33_24_edges, length=F33_24_SIZE)


with BuildPart() as f9_1:
    add(f9.part)

    # F33#2
    f33_2_edges = [f9_1.edges().sort_by_distance(p)[0] for p in [
        (-450, 1956, 2522),
    ]]
    chamfer(f33_2_edges, length=F33_2_SIZE)


with BuildPart() as f9b_1:
    add(f9b.part)

    # F33#4
    f33_4_edges = [f9b_1.edges().sort_by_distance(p)[0] for p in [
        (-450, 1744, 2339),
    ]]
    chamfer(f33_4_edges, length=F33_4_SIZE)


with BuildPart() as f9c_1:
    add(f9c.part)

    # F33#6
    f33_6_edges = [f9c_1.edges().sort_by_distance(p)[0] for p in [
        (-450, 1532, 2156),
    ]]
    chamfer(f33_6_edges, length=F33_6_SIZE)


with BuildPart() as f9d_1:
    add(f9d.part)

    # F33#8
    f33_8_edges = [f9d_1.edges().sort_by_distance(p)[0] for p in [
        (-450, 1320, 1973),
    ]]
    chamfer(f33_8_edges, length=F33_8_SIZE)


with BuildPart() as f9e_1:
    add(f9e.part)

    # F33#10
    f33_10_edges = [f9e_1.edges().sort_by_distance(p)[0] for p in [
        (-450, 1108, 1790),
    ]]
    chamfer(f33_10_edges, length=F33_10_SIZE)


with BuildPart() as f9f_1:
    add(f9f.part)

    # F33#12
    f33_12_edges = [f9f_1.edges().sort_by_distance(p)[0] for p in [
        (-450, 896, 1607),
    ]]
    chamfer(f33_12_edges, length=F33_12_SIZE)


with BuildPart() as f9g_1:
    add(f9g.part)

    # F33#14
    f33_14_edges = [f9g_1.edges().sort_by_distance(p)[0] for p in [
        (-450, 684, 1424),
    ]]
    chamfer(f33_14_edges, length=F33_14_SIZE)


with BuildPart() as f9h_1:
    add(f9h.part)

    # F33#16
    f33_16_edges = [f9h_1.edges().sort_by_distance(p)[0] for p in [
        (-450, 472, 1241),
    ]]
    chamfer(f33_16_edges, length=F33_16_SIZE)


with BuildPart() as f9i_1:
    add(f9i.part)

    # F33#18
    f33_18_edges = [f9i_1.edges().sort_by_distance(p)[0] for p in [
        (-450, 260, 1058),
    ]]
    chamfer(f33_18_edges, length=F33_18_SIZE)


with BuildPart() as f9j_1:
    add(f9j.part)

    # F33#19
    f33_19_edges = [f9j_1.edges().sort_by_distance(p)[0] for p in [
        (-450, 48, 875),
    ]]
    chamfer(f33_19_edges, length=F33_19_SIZE)


with BuildPart() as f9k_1:
    add(f9k.part)

    # F33#20
    f33_20_edges = [f9k_1.edges().sort_by_distance(p)[0] for p in [
        (-450, -164, 692),
    ]]
    chamfer(f33_20_edges, length=F33_20_SIZE)


solid = Compound([f3.part, f5.part, f10.part, f10b.part, f10c.part, f10d.part, f10e.part, f10f.part, f10g.part, f10h.part, f10i.part, f10j.part, f12.part, f13.part, f18.part, f20.part, f22.part, f9_1.part, f9b_1.part, f9c_1.part, f9d_1.part, f9e_1.part, f9f_1.part, f9g_1.part, f9h_1.part, f9i_1.part, f9j_1.part, f9k_1.part])
